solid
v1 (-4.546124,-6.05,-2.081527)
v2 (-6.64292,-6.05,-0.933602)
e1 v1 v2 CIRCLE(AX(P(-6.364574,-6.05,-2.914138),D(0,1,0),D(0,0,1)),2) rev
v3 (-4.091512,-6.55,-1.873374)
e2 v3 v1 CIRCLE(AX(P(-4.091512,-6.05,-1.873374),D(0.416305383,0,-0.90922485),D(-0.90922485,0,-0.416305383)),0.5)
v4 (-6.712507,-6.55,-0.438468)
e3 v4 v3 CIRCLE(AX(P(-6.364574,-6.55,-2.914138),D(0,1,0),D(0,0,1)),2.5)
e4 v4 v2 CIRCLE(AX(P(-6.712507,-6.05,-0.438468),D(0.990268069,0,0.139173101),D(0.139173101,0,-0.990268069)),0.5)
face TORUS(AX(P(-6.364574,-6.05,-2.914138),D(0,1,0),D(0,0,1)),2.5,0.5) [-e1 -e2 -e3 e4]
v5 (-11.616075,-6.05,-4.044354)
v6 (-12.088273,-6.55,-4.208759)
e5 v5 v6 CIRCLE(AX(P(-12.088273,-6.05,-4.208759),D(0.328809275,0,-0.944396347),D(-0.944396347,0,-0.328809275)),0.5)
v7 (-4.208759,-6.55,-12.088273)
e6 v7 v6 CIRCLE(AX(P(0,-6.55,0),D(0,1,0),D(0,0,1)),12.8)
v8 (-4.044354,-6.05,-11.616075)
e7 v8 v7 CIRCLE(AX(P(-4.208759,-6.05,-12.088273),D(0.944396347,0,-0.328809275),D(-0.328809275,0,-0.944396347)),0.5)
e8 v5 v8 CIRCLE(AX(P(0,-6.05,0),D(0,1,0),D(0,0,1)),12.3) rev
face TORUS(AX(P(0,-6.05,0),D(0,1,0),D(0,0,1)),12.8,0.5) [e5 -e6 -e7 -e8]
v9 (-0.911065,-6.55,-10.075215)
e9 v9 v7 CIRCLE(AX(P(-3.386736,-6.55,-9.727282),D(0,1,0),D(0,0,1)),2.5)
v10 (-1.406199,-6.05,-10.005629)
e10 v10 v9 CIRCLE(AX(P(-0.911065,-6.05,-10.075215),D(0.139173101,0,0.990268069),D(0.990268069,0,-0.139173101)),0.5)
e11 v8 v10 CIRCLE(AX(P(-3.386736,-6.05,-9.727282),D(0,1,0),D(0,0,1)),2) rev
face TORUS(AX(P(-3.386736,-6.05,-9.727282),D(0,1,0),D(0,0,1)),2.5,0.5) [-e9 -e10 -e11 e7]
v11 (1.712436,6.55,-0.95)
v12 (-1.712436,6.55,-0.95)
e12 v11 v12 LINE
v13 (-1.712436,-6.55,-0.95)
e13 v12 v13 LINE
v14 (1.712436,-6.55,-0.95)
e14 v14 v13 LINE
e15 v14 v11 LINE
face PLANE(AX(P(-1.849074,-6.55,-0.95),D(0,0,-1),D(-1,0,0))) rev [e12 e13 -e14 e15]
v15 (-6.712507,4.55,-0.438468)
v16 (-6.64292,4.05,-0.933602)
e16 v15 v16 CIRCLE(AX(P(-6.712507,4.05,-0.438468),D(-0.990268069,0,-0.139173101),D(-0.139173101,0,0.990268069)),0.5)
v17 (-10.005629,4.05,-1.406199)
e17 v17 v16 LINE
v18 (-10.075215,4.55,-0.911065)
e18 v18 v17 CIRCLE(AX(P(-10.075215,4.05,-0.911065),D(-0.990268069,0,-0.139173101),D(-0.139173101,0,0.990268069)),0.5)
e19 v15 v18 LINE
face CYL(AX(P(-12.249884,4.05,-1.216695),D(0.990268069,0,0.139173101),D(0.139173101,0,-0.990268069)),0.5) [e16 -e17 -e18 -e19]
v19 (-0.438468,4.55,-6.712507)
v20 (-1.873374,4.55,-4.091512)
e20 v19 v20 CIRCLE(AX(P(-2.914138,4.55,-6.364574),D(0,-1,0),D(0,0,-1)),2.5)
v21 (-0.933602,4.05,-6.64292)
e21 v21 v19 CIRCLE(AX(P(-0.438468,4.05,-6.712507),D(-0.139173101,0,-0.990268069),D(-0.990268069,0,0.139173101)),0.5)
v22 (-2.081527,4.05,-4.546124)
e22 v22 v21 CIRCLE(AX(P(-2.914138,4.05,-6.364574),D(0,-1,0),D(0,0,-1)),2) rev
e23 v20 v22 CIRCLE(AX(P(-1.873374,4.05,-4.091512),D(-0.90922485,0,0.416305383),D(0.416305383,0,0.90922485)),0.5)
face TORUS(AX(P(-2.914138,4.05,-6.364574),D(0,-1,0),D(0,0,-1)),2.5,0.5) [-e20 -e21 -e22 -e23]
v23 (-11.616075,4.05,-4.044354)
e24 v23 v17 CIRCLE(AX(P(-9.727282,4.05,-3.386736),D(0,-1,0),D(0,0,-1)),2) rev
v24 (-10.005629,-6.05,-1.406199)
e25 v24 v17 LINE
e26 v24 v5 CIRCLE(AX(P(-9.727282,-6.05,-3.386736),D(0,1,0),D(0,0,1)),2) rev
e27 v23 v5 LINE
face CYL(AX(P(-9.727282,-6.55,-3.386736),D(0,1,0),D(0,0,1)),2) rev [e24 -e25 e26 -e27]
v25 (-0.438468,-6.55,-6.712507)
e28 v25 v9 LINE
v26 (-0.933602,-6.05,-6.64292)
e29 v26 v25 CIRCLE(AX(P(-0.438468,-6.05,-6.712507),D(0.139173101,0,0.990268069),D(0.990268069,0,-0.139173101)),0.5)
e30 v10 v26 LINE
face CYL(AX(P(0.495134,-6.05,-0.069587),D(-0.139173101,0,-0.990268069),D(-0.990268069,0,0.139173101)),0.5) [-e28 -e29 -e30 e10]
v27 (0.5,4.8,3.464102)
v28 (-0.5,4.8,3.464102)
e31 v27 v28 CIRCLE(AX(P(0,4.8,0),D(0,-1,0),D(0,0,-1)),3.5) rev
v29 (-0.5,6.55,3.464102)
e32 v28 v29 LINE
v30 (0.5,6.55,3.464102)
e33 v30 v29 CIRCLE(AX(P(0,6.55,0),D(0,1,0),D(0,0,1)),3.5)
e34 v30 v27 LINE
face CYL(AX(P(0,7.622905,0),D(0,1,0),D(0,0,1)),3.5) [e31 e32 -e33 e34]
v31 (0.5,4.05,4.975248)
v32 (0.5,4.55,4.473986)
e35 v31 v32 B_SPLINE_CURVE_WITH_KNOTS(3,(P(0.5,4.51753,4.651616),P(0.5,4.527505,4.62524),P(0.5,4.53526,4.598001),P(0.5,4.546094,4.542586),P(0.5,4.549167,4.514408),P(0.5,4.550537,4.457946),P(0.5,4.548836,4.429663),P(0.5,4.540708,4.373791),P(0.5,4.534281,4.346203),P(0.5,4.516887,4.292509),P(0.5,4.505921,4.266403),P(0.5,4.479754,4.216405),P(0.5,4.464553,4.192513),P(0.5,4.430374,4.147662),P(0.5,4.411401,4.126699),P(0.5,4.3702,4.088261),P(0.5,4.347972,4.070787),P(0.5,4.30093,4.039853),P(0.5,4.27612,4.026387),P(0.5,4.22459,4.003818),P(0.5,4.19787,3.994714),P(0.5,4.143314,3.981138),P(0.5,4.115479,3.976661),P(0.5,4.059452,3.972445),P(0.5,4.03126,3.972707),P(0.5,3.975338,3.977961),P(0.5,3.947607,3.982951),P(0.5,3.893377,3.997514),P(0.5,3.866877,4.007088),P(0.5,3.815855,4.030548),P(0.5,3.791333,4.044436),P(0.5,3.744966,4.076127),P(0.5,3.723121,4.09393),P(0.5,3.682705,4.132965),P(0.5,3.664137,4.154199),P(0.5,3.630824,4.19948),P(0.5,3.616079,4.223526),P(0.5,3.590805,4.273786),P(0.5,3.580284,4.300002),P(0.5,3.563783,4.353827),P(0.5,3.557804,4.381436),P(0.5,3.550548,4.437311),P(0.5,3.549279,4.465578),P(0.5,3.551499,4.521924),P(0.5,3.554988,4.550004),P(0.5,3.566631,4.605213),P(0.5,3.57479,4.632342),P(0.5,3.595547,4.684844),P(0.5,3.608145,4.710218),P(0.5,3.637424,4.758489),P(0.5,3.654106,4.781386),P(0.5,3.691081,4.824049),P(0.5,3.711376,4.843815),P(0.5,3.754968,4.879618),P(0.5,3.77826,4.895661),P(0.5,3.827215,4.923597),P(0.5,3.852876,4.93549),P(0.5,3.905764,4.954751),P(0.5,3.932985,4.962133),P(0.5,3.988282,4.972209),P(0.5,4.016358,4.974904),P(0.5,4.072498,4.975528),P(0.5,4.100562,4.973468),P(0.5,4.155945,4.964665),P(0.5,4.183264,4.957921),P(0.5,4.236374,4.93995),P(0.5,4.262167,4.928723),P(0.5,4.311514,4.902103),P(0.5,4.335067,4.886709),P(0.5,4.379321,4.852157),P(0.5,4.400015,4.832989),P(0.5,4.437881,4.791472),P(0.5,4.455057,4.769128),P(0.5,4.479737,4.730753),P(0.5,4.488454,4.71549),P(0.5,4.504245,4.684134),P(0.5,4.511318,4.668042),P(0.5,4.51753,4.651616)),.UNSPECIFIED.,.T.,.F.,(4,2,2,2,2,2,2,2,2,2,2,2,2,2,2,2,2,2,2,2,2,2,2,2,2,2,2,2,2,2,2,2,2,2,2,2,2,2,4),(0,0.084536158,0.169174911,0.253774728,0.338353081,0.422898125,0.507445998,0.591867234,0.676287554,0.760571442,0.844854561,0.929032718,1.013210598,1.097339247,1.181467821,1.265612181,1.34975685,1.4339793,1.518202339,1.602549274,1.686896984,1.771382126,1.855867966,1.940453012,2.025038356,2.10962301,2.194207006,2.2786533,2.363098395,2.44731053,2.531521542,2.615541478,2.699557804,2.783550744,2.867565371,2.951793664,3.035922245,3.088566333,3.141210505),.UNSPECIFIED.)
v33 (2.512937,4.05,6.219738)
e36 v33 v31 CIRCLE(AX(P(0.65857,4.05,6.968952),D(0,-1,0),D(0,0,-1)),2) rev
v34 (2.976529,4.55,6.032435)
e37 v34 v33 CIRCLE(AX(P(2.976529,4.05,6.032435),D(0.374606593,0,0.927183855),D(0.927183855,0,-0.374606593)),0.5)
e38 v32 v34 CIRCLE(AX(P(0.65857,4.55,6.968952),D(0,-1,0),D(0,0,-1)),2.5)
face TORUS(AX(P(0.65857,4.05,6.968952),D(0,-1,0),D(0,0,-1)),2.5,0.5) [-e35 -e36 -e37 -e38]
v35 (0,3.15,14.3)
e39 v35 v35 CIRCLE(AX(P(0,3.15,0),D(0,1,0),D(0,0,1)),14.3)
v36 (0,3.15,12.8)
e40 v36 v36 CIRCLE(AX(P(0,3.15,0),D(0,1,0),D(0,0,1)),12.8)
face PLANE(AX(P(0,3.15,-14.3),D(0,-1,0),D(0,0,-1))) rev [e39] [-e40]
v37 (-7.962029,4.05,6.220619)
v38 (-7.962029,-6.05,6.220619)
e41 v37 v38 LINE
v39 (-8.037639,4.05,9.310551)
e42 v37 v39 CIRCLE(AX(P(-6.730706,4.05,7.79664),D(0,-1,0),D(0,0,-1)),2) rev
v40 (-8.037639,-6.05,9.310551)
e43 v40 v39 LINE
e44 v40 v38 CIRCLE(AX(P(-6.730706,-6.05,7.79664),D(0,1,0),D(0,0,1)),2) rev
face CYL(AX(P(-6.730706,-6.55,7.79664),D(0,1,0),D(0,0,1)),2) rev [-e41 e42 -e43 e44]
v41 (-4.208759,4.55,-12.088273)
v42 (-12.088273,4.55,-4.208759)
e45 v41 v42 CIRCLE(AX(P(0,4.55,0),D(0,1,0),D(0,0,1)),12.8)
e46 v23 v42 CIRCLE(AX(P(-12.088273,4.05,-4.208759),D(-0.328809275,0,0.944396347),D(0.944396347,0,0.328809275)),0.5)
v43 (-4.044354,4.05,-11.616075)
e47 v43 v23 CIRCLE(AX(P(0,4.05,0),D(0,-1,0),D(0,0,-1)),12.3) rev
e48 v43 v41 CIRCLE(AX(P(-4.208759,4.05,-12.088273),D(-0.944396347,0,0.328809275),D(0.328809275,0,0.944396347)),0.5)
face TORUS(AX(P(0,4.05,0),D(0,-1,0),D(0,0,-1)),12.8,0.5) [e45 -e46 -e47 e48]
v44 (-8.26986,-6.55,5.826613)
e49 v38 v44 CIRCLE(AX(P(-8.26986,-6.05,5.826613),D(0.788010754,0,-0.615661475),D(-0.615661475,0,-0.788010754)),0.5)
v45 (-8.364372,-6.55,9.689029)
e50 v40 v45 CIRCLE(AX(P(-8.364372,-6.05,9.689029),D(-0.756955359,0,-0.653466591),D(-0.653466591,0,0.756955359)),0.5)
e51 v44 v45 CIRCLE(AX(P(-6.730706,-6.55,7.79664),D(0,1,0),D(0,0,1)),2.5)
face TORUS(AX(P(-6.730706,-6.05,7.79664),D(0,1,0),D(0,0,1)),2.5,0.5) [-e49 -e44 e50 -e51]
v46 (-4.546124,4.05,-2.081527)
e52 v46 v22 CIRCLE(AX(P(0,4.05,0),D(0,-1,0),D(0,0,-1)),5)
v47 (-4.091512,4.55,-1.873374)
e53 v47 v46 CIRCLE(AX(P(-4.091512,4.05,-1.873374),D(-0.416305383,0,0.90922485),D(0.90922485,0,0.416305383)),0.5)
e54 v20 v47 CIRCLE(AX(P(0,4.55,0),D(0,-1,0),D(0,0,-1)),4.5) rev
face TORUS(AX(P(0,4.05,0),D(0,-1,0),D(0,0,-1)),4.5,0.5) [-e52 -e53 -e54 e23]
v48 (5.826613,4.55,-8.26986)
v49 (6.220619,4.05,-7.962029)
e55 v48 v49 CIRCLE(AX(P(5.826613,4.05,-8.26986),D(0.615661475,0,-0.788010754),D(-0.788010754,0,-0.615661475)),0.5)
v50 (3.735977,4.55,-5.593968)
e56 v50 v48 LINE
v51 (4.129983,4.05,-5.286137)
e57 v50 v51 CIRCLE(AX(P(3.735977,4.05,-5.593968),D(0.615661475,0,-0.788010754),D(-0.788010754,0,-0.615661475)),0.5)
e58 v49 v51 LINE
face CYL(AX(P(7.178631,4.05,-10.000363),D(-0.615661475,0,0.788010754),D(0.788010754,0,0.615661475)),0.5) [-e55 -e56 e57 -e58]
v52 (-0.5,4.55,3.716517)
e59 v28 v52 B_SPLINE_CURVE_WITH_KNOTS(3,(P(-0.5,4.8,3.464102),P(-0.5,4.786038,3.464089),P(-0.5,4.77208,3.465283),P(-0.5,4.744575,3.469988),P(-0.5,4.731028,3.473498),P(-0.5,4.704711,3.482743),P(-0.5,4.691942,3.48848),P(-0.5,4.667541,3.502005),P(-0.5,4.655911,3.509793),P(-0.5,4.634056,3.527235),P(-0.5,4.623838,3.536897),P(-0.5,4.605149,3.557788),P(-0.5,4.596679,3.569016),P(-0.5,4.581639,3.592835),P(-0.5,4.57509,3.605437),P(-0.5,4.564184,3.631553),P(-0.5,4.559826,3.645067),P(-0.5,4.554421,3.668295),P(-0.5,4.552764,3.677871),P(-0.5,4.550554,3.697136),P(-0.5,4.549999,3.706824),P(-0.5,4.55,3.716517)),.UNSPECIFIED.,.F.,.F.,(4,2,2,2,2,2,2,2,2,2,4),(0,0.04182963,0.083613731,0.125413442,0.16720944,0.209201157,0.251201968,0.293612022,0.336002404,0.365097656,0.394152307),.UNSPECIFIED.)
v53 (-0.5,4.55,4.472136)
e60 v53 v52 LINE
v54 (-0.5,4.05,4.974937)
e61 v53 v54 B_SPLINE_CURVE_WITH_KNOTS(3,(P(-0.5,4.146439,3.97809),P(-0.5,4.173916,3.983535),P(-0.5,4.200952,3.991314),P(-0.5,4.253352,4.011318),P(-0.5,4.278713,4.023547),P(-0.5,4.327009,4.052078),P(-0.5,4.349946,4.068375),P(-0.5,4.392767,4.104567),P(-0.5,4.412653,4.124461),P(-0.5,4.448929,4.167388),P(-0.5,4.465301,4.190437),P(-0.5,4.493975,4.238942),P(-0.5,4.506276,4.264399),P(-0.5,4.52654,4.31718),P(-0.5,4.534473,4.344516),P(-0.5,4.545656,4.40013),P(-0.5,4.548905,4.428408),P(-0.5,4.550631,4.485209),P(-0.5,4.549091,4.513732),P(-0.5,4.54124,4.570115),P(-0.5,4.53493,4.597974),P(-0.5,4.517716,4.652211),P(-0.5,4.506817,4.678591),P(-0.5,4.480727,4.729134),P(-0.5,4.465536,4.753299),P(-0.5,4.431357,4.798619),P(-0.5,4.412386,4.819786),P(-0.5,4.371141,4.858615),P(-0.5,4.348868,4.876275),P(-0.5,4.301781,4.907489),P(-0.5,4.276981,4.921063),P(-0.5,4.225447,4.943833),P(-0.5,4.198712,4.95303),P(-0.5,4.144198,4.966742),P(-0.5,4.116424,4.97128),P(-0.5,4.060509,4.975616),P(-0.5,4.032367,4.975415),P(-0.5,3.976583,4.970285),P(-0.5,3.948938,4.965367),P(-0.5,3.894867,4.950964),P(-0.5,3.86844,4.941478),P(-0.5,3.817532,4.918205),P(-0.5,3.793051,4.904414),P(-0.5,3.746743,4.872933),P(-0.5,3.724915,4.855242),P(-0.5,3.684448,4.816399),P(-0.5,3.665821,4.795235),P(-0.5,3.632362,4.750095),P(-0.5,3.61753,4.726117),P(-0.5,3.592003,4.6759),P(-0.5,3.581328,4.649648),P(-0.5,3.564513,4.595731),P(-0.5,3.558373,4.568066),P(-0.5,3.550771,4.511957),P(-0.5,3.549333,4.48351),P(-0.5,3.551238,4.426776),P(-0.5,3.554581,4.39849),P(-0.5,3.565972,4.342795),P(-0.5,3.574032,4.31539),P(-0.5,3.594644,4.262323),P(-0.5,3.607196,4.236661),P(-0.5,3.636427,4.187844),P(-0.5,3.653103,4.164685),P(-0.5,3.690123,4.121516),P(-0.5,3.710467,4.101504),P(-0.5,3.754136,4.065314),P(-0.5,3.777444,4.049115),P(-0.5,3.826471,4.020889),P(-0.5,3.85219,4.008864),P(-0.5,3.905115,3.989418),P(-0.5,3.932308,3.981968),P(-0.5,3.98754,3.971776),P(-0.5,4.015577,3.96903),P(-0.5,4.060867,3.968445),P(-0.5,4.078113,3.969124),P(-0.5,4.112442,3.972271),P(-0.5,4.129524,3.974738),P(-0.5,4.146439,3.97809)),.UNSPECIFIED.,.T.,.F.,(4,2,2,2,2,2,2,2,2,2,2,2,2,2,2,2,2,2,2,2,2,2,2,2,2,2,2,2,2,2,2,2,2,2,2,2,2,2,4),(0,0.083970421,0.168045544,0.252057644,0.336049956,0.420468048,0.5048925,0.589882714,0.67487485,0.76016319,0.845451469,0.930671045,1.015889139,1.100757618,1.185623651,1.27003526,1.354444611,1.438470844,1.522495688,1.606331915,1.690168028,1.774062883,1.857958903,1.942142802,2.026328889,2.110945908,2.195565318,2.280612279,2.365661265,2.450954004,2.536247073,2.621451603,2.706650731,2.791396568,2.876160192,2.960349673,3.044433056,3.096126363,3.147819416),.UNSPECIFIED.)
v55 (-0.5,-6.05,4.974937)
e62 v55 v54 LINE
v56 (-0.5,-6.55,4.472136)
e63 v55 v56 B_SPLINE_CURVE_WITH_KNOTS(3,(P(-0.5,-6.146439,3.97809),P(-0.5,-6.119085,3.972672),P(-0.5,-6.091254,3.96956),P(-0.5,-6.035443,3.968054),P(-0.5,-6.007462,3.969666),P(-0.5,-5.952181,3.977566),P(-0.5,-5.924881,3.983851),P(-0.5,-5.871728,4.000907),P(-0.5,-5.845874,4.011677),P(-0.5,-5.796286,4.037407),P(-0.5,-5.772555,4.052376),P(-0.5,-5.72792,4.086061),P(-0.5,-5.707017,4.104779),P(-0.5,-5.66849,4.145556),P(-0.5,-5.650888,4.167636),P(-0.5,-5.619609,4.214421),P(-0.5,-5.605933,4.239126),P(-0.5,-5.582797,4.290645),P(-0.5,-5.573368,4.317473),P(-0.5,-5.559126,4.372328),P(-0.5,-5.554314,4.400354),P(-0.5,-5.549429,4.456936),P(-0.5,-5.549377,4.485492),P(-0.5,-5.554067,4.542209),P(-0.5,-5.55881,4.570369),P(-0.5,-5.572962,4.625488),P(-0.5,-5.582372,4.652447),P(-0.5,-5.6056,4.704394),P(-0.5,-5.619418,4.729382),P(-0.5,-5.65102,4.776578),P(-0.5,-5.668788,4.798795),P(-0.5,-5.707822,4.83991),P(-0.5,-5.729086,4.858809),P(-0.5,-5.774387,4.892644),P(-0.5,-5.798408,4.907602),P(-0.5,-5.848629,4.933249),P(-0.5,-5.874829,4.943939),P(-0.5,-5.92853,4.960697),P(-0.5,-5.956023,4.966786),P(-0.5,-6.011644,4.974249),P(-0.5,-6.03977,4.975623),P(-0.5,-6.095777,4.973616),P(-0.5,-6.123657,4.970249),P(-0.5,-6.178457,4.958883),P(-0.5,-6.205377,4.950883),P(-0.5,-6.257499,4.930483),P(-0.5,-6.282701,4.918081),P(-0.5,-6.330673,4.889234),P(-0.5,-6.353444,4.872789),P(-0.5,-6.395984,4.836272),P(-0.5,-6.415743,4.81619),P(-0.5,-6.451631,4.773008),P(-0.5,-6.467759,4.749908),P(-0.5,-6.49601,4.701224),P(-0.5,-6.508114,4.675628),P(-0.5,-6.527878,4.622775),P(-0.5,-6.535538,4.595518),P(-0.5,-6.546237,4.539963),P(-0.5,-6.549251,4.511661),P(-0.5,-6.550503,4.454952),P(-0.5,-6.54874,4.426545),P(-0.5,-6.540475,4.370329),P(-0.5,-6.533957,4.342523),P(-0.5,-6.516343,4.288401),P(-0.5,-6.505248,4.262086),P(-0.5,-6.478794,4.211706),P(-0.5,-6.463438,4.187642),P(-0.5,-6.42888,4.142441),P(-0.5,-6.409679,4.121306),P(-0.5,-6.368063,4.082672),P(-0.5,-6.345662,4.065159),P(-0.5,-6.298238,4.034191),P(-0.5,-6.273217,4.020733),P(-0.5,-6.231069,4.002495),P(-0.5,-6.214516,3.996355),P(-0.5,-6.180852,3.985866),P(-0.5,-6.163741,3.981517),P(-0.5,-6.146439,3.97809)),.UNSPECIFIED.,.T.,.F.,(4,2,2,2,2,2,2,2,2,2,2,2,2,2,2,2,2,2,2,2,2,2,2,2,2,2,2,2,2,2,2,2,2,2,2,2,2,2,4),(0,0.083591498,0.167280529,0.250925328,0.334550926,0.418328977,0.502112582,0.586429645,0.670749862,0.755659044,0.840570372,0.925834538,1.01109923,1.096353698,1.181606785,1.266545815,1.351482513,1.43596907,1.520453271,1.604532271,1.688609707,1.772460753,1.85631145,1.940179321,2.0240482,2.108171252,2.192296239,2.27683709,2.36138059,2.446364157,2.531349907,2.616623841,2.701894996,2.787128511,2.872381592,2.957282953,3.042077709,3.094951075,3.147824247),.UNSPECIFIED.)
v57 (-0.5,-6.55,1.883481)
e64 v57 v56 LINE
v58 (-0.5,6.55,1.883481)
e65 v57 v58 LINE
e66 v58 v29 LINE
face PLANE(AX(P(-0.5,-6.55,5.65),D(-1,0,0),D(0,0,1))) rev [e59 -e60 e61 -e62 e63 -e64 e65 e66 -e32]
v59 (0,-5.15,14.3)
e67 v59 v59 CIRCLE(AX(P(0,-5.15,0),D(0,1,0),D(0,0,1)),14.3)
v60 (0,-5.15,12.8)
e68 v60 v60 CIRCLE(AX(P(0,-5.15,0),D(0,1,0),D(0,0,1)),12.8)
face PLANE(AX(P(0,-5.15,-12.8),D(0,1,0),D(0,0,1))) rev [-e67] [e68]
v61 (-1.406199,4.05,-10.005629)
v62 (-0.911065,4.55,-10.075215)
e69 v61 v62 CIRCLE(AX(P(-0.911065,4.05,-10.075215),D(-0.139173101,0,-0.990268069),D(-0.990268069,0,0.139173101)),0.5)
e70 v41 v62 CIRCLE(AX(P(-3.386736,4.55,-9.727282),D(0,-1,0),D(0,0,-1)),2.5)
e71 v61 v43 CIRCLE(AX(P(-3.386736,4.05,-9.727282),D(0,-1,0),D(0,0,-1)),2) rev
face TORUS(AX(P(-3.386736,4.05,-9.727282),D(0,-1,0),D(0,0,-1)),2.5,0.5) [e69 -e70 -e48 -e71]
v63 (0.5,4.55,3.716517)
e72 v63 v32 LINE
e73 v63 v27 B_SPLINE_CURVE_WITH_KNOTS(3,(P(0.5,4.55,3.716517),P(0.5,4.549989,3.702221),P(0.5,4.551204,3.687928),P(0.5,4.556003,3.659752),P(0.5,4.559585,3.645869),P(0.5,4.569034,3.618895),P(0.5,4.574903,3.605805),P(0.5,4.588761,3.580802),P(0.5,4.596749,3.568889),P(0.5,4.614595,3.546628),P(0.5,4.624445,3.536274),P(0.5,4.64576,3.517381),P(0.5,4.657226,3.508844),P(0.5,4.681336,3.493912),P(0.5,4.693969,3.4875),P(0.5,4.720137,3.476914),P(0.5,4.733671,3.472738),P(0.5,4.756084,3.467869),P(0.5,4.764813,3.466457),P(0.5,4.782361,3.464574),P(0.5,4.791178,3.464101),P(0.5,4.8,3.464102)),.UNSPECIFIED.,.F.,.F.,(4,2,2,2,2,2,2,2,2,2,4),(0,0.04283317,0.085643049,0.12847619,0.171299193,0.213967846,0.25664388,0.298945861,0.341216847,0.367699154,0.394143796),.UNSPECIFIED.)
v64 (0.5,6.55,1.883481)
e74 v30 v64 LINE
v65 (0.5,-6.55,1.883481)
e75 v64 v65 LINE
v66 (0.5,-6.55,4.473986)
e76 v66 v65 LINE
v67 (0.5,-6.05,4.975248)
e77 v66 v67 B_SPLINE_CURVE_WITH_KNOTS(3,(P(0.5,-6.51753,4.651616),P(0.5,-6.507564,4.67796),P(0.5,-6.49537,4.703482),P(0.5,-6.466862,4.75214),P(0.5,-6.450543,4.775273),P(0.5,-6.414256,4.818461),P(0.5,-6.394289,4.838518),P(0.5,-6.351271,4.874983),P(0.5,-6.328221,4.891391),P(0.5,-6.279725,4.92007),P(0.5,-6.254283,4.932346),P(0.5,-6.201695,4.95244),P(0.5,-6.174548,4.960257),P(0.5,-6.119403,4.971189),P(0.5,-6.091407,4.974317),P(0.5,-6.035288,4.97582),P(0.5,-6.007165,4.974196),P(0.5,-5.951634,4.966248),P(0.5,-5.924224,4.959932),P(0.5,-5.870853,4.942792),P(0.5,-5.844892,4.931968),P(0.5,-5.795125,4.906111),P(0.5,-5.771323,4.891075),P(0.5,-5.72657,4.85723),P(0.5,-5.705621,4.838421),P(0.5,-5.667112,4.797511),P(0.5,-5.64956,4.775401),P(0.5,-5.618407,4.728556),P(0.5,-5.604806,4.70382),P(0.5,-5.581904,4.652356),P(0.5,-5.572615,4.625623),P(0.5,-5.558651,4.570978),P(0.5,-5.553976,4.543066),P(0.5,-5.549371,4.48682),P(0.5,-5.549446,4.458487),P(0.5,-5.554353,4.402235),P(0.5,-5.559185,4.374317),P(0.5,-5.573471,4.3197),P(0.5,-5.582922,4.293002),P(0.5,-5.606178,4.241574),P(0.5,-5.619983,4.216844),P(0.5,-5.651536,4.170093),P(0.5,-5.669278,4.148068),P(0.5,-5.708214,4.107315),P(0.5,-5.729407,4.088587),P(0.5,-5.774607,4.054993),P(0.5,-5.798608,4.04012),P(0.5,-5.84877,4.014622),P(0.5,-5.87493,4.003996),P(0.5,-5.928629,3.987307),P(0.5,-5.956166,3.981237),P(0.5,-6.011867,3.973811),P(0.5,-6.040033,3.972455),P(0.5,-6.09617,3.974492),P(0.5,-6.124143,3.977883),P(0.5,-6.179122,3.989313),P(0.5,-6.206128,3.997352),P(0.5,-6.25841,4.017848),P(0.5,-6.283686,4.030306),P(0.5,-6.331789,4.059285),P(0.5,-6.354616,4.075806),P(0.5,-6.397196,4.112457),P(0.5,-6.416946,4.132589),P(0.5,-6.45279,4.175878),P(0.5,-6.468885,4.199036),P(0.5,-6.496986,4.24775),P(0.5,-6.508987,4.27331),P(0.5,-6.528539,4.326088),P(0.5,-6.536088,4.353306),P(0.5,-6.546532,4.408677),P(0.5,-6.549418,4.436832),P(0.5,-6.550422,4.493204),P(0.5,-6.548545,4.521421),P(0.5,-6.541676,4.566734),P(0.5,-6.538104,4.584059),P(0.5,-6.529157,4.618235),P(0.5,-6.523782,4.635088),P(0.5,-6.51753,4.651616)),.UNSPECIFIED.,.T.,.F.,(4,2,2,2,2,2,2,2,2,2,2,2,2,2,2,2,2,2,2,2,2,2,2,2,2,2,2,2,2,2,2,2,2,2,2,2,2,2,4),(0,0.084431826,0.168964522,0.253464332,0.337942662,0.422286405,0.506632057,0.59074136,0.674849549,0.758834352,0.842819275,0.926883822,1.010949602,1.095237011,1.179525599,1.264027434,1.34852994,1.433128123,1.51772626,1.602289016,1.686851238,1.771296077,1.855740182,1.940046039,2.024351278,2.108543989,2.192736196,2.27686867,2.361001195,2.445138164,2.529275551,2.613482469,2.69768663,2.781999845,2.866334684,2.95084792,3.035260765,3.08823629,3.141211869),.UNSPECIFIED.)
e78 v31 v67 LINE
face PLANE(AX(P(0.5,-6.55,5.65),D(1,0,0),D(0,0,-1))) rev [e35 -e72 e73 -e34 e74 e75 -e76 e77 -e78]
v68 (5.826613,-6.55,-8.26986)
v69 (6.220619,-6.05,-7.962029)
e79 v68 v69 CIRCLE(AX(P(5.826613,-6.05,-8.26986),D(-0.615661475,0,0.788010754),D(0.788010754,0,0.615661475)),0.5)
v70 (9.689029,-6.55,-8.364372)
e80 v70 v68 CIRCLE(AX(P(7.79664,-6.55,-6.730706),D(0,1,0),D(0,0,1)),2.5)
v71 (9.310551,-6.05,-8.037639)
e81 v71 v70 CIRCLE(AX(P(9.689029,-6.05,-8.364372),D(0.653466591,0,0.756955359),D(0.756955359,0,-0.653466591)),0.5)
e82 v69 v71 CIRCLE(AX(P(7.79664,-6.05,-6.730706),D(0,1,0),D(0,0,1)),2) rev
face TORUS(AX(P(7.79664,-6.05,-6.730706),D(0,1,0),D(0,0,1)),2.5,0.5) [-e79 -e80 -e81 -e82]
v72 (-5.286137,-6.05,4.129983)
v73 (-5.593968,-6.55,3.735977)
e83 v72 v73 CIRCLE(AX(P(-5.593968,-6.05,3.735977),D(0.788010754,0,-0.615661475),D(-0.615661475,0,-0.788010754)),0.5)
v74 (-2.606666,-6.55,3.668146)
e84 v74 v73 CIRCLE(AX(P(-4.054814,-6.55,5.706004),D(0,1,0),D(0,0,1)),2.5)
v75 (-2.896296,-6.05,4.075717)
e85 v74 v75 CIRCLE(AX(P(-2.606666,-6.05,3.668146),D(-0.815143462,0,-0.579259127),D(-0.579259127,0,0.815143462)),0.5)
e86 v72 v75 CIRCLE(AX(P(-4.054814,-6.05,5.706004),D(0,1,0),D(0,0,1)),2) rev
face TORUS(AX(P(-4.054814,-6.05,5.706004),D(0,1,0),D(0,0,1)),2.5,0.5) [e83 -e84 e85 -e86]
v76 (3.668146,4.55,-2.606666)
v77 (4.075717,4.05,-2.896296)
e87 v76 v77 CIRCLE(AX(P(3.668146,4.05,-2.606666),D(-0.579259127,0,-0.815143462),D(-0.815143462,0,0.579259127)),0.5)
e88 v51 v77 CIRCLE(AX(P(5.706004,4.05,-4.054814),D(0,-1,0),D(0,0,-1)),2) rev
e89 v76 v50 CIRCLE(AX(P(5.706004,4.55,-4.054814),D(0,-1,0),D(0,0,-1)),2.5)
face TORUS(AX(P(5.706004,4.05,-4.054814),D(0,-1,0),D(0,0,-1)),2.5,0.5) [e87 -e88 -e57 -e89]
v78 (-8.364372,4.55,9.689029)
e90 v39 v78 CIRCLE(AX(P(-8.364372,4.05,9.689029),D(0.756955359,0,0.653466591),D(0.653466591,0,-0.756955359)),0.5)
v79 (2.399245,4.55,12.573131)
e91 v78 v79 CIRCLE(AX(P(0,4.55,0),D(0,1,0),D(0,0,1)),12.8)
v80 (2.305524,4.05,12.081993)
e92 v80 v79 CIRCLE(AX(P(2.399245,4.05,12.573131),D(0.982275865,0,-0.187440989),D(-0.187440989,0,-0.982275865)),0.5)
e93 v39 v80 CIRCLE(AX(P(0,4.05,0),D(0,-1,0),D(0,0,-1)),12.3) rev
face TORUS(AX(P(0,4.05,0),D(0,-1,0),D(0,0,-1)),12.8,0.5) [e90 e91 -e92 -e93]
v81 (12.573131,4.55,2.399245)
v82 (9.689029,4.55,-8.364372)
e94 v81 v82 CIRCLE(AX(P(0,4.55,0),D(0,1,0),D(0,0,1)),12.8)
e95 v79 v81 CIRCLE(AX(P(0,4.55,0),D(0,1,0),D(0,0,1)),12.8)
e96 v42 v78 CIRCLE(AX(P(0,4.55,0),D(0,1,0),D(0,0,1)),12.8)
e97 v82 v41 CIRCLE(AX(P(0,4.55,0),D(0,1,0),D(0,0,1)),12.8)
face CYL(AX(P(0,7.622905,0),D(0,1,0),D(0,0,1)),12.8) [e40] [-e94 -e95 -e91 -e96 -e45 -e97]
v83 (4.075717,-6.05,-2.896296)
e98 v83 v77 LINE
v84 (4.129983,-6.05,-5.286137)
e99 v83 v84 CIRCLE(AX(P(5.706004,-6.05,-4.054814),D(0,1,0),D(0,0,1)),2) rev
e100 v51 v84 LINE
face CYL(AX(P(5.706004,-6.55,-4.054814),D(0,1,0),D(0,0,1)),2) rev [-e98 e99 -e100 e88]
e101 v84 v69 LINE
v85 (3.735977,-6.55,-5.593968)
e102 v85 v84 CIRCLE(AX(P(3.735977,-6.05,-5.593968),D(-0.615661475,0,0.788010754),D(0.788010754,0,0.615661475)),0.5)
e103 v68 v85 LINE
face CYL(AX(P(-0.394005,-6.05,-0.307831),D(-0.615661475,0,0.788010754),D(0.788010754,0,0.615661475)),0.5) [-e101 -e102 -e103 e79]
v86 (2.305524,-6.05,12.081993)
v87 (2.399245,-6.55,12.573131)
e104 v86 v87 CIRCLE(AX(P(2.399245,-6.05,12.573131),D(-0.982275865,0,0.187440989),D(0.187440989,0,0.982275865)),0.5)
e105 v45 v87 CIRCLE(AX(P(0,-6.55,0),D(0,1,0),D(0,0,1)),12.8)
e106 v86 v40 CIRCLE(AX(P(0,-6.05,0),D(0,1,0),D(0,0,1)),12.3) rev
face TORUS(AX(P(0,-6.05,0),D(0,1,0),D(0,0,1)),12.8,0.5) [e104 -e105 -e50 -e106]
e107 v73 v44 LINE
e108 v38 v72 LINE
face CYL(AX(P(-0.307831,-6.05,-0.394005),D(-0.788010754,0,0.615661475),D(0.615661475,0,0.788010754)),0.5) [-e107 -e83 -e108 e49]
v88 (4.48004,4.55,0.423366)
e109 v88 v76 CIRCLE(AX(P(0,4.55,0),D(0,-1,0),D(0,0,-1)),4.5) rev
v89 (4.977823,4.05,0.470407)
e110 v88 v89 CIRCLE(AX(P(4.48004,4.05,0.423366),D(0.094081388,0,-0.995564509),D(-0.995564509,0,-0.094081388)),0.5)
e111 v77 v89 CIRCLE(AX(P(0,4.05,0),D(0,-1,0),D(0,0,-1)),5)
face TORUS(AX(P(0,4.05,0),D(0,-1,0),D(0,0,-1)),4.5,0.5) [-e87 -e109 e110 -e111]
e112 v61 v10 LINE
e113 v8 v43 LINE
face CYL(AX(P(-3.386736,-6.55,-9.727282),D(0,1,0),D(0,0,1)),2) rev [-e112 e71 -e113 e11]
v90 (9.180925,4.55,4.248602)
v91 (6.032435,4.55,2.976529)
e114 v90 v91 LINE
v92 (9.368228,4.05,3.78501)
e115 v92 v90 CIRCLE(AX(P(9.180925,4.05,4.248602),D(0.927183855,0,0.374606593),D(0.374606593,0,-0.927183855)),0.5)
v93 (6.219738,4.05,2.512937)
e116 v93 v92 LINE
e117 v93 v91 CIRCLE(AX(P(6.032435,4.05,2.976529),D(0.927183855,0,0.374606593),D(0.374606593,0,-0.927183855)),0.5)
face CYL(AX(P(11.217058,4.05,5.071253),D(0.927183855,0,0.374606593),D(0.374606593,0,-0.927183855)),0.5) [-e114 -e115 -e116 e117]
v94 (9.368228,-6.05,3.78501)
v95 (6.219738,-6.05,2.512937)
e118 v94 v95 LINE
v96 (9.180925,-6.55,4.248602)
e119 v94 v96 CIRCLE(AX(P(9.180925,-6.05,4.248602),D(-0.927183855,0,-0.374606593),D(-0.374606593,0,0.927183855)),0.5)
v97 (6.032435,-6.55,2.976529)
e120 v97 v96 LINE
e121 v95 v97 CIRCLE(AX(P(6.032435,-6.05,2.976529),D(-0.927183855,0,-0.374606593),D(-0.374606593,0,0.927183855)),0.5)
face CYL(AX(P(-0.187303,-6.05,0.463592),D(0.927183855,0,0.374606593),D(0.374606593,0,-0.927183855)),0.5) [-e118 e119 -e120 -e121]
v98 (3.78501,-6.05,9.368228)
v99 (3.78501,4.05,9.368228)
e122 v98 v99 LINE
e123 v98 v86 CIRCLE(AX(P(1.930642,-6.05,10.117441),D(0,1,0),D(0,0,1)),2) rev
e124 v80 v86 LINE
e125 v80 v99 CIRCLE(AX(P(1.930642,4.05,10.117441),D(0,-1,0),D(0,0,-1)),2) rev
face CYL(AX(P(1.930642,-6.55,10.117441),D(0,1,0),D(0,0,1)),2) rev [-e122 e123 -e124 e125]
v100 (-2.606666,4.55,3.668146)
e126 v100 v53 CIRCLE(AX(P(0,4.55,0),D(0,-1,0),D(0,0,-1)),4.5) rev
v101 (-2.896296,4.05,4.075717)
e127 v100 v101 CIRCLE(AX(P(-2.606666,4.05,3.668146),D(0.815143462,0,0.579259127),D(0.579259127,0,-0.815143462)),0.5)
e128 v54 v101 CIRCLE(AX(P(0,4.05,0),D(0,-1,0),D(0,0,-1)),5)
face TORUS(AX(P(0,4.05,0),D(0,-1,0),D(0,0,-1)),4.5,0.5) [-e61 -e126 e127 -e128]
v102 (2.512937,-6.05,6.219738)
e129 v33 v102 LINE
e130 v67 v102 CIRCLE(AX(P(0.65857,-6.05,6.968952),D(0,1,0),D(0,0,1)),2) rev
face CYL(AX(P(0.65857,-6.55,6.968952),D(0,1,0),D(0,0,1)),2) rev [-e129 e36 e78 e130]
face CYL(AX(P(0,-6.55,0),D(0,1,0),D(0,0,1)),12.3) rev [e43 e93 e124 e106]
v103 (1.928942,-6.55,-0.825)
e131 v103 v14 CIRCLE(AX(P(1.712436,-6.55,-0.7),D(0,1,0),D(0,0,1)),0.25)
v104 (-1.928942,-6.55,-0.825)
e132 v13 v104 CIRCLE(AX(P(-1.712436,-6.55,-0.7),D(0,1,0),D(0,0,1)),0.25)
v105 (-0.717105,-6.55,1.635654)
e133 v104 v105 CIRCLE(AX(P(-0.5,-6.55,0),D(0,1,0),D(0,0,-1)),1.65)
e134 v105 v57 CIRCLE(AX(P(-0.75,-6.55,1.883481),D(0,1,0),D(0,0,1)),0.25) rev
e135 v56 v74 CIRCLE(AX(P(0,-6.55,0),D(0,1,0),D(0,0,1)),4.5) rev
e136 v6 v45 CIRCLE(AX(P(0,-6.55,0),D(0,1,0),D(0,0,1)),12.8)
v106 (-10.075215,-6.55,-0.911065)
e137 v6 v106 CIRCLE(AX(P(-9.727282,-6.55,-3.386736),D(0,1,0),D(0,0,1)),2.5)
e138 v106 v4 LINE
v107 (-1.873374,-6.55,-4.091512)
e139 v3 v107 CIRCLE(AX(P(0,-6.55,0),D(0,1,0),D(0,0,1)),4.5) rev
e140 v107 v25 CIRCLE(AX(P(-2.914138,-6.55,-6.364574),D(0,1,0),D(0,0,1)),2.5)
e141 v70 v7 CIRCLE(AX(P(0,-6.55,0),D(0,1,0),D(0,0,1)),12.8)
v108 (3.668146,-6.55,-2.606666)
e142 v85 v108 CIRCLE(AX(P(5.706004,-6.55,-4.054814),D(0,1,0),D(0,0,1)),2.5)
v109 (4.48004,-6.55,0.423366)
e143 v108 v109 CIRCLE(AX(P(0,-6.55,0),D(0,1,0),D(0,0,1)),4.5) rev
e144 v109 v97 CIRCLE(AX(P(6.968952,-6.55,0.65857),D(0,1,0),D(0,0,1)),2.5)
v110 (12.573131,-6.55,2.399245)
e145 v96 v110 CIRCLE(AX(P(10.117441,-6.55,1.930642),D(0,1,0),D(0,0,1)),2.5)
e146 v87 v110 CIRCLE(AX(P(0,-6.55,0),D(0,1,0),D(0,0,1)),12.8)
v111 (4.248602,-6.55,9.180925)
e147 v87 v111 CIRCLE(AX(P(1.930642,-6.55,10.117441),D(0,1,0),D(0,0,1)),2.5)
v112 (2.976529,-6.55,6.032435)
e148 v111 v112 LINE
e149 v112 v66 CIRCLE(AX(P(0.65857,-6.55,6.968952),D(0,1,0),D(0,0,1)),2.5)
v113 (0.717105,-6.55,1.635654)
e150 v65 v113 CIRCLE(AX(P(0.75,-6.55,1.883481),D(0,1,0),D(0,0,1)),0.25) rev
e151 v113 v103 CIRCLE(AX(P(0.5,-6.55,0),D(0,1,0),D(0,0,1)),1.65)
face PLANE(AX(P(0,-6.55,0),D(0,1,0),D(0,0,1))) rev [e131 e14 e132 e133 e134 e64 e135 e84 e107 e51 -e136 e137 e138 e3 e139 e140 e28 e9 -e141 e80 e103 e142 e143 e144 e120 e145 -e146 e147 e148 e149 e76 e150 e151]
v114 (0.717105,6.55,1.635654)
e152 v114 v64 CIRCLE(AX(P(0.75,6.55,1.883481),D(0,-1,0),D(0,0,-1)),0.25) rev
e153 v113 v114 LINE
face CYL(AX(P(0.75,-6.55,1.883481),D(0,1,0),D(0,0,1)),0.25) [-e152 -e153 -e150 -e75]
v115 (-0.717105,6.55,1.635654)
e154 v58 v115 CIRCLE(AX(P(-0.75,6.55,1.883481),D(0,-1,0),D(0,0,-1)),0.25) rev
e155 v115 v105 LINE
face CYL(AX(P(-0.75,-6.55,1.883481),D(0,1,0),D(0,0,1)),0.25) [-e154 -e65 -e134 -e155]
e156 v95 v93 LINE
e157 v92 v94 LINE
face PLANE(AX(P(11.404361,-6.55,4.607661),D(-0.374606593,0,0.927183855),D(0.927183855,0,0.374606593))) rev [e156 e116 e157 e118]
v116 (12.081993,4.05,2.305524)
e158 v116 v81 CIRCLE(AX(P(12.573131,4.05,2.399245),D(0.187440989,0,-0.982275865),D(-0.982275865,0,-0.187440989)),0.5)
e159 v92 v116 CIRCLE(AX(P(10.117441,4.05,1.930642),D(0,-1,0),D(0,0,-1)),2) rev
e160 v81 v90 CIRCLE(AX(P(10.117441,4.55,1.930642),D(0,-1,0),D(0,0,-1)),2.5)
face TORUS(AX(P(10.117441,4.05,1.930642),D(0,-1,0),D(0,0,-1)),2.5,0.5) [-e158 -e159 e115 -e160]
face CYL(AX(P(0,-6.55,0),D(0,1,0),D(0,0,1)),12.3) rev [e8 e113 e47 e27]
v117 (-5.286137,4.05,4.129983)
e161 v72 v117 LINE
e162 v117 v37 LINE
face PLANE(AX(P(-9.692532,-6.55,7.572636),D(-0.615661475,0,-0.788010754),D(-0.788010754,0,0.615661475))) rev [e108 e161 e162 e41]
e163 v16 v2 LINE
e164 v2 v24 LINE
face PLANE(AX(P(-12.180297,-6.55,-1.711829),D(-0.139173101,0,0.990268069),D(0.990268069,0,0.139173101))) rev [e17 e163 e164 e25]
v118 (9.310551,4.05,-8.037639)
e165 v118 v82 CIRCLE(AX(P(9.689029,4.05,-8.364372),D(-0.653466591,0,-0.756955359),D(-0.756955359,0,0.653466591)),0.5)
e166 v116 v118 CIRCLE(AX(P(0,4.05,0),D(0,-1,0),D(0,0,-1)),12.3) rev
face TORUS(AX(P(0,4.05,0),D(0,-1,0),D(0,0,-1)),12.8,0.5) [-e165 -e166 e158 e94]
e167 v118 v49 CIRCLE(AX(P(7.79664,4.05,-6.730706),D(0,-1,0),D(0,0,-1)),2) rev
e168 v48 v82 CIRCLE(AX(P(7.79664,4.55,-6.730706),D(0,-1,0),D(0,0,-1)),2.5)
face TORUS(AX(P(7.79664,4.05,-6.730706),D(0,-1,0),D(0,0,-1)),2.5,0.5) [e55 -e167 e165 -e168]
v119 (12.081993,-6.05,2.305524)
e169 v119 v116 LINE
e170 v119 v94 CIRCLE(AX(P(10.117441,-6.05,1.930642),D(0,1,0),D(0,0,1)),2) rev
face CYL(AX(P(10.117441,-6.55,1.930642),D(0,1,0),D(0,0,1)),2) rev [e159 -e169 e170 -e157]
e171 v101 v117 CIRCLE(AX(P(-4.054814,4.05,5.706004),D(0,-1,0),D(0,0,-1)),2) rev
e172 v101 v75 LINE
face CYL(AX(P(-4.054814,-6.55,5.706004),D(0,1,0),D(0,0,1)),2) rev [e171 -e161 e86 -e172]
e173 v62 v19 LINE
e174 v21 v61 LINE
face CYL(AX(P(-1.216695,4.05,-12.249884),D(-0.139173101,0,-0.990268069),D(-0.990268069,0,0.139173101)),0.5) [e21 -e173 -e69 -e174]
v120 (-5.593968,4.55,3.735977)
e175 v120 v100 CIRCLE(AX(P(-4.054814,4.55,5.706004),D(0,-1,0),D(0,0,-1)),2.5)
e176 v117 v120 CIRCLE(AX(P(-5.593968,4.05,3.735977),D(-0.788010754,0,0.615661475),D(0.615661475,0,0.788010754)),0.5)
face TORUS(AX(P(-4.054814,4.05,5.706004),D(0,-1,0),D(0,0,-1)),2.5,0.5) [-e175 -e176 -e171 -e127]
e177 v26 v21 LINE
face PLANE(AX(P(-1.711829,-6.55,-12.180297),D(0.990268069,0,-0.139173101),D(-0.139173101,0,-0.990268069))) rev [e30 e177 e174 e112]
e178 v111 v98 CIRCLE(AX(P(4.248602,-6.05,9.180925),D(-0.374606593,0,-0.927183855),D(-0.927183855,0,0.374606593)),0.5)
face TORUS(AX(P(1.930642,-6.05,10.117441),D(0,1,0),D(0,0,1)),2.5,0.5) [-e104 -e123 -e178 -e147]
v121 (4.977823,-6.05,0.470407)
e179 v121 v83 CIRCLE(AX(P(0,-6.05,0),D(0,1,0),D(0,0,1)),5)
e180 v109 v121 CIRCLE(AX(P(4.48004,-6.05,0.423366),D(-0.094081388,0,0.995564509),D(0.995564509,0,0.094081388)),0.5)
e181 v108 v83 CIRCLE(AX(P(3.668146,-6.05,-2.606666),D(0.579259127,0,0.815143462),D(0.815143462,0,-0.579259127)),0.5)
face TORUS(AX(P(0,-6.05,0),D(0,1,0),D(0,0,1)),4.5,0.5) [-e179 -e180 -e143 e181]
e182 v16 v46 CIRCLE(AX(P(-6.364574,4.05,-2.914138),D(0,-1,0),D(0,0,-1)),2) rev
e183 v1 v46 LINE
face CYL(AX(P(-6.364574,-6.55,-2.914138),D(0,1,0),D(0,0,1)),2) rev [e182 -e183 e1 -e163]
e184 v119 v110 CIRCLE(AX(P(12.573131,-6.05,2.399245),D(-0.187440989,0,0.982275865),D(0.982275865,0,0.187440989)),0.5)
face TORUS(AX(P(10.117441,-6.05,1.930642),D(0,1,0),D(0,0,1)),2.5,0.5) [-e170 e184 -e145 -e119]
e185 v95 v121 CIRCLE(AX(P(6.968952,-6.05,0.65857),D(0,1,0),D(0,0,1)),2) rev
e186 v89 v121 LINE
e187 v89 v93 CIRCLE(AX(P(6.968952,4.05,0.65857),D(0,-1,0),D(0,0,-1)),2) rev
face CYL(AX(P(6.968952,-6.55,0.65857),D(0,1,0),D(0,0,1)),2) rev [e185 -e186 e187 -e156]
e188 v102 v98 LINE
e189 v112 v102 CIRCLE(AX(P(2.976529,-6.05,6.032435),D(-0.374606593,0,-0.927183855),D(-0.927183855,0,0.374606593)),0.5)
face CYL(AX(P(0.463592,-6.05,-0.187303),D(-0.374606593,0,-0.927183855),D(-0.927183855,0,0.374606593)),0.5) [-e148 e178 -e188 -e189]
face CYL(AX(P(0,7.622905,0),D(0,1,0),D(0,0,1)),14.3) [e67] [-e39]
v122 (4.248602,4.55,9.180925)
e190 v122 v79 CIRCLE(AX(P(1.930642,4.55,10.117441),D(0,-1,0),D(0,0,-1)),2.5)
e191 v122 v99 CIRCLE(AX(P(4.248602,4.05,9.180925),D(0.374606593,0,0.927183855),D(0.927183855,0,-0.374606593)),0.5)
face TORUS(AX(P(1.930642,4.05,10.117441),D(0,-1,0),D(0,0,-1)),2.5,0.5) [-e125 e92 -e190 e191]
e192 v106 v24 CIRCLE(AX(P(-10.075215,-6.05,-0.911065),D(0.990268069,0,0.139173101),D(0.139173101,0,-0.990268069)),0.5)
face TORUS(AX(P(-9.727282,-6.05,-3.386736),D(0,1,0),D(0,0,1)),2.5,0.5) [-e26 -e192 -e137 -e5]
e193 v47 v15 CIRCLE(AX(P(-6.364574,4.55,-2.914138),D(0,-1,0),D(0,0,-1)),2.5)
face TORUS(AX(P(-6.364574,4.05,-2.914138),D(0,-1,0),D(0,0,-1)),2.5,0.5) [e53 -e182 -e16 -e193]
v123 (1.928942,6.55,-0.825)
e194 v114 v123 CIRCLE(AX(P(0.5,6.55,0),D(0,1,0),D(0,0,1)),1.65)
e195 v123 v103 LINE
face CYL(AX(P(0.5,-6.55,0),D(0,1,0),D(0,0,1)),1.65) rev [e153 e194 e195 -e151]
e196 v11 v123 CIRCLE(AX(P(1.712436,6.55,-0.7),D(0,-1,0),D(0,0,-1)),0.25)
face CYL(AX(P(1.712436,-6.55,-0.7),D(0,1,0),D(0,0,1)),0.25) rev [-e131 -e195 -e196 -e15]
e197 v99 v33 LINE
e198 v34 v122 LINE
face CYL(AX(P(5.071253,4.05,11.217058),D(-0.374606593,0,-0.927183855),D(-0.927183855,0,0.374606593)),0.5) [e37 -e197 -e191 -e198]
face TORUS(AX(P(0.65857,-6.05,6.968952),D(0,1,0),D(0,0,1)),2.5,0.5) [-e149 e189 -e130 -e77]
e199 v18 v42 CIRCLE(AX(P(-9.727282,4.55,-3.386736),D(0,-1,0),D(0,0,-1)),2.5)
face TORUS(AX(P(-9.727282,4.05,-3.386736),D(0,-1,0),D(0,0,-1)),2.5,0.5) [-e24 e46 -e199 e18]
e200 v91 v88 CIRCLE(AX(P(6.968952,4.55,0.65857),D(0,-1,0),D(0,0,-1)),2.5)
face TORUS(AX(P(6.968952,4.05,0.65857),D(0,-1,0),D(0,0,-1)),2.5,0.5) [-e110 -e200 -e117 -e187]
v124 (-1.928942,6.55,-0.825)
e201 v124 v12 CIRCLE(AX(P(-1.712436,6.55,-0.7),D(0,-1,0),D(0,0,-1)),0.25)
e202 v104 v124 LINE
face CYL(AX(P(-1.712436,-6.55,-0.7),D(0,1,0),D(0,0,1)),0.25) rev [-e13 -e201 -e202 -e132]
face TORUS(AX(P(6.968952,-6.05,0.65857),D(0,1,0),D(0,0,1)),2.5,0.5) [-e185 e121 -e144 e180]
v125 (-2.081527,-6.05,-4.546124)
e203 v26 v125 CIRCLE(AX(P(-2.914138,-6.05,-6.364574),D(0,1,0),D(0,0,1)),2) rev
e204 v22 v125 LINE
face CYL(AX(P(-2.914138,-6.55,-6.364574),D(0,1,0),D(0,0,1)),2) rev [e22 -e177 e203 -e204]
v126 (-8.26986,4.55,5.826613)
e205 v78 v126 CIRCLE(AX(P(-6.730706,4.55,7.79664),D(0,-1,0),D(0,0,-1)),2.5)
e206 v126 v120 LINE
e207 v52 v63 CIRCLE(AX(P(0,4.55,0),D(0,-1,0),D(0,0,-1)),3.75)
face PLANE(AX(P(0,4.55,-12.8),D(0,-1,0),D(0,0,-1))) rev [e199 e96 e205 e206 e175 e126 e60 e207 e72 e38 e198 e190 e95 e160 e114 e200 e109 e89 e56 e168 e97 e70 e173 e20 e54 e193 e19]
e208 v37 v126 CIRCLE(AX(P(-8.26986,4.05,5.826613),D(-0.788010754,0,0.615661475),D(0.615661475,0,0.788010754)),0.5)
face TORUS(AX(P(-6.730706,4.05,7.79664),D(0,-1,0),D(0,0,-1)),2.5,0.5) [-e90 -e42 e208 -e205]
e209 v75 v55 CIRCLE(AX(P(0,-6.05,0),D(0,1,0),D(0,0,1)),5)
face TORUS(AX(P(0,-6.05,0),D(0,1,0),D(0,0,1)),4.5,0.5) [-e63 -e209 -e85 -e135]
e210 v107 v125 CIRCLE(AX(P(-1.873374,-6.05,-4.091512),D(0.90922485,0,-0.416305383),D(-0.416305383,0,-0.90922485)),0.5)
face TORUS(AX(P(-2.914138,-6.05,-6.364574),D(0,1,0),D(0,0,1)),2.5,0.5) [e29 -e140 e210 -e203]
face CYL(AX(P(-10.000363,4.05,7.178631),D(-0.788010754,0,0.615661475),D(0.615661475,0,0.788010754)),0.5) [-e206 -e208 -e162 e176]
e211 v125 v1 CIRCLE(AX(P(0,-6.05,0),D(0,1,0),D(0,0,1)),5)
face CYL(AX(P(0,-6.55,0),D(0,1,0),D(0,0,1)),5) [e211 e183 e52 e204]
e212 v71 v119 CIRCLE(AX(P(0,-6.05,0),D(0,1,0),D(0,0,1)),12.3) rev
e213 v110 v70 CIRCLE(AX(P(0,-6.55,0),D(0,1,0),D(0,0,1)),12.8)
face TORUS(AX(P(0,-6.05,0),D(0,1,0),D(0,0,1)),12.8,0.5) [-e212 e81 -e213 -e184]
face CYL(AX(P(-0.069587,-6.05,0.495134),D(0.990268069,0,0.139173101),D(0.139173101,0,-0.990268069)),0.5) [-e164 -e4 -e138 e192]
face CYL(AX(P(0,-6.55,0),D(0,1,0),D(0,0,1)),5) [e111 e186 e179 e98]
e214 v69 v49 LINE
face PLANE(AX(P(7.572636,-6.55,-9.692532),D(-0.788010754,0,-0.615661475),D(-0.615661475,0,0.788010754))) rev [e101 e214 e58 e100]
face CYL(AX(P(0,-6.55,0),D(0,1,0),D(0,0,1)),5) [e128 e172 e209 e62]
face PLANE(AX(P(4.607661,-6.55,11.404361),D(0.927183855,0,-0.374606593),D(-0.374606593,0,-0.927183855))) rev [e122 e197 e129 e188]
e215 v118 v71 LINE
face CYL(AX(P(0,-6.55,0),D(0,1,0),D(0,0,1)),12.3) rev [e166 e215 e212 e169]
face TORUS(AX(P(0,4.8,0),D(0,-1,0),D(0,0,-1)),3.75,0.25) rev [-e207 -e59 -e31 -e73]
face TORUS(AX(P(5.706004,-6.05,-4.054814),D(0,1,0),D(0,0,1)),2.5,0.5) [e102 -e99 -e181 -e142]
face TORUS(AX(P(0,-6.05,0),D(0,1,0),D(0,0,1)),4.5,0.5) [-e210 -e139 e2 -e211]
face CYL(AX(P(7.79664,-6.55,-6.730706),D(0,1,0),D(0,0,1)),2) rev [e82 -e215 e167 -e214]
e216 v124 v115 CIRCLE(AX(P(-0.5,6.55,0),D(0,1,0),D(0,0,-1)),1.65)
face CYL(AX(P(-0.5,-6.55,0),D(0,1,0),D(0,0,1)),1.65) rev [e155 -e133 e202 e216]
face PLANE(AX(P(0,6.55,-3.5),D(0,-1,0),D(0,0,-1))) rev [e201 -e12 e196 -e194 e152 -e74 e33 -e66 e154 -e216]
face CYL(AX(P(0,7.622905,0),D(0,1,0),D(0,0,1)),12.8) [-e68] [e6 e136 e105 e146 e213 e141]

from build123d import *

# Parameters (mm, degrees)
CUT_EXTRUDE1_DEPTH       = 24.069243594
FILLET1_R                = 2
FILLET2_R                = 0.5
CIRPATTERN1_COUNT        = 3
FILLET1_OF_CIRPATTERN1_R = 2
FILLET2_OF_CIRPATTERN1_R = 0.5
CUT_EXTRUDE3_DEPTH       = 25.095435307
FILLET3_R                = 0.25
FILLET4_R                = 0.25


with BuildPart() as part:
    # Sketch1 → Revolve1 (revolve)
    with BuildSketch(Plane(origin=(0, 0, 0), x_dir=(0, 0, -1), z_dir=(1, 0, 0)), mode=Mode.PRIVATE) as revolve1_sk:
        Polygon((0, -6.55), (12.8, -6.55), (12.8, -5.15), (14.3, -5.15), (14.3, 3.15), (12.8, 3.15), (12.8, 4.55), (3.5, 4.55), (3.5, 6.55), (0, 6.55), align=None)
    revolve(revolve1_sk.sketch.rotate(Axis((0, 7.622905435, 0), (0, -1, 0)), 180), axis=Axis((0, 7.622905435, 0), (0, -1, 0)))

    # Sketch2 → Cut-Extrude1 (cut, through all)
    with BuildSketch(Plane(origin=(0, 4.55, 0), x_dir=(1, 0, 0), z_dir=(0, 1, 0))):
        with BuildLine():
            Line((-1.711829142, 12.180297246), (-0.695865505, 4.951340344))
            ThreePointArc((-0.695865505, 4.951340344), (-3.535533906, 3.535533906), (-4.951340344, 0.695865505))
            Line((-4.951340344, 0.695865505), (-12.180297246, 1.711829142))
            ThreePointArc((-12.180297246, 1.711829142), (-8.697413409, 8.697413409), (-1.711829142, 12.180297246))
        make_face()
    cut_extrude1 = extrude(amount=-CUT_EXTRUDE1_DEPTH, mode=Mode.SUBTRACT)

    # Fillet1
    fillet1_edges = [part.edges().sort_by_distance(p)[0] for p in [
        (-12.180297246, -1, -1.711829142),
        (-1.711829142, -1, -12.180297246),
        (-0.695865505, -1, -4.951340344),
        (-4.951340344, -1, -0.695865505),
    ]]
    fillet(fillet1_edges, radius=FILLET1_R)

    # Fillet2
    fillet2_edges = [part.edges().sort_by_distance(p)[0] for p in [
        (-3.535533906, 4.55, -3.535533906),
        (-3.535533906, -6.55, -3.535533906),
        (-8.324274366, 4.55, -1.169900468),
        (-8.324274366, -6.55, -1.169900468),
        (-1.169900468, 4.55, -8.324274366),
        (-1.169900468, -6.55, -8.324274366),
        (-8.697413409, 4.55, -8.697413409),
        (-8.697413409, -6.55, -8.697413409),
        (-5.404150679, 4.55, -1.159832365),
        (-5.404150679, -6.55, -1.159832365),
        (-1.159832365, 4.55, -5.404150679),
        (-1.159832365, -6.55, -5.404150679),
        (-11.43435232, 4.55, -2.344664413),
        (-11.43435232, -6.55, -2.344664413),
        (-2.344664413, 4.55, -11.43435232),
        (-2.344664413, -6.55, -11.43435232),
    ]]
    fillet(fillet2_edges, radius=FILLET2_R - 0.0001)  # a hair under: the kernel refuses the full size

    # CirPattern1: Cut-Extrude1 ×3 about axis
    cirpattern1_axis = Axis((0, 0, 0), (0, 1, 0))
    for i in range(1, CIRPATTERN1_COUNT):
        add(cut_extrude1.rotate(cirpattern1_axis, i * 360 / CIRPATTERN1_COUNT), mode=Mode.SUBTRACT)

    # Fillet1 of CirPattern1
    fillet1_of_cirpattern1_edges = [part.edges().sort_by_distance(p)[0] for p in [
        (4.607661099, -1, 11.404361411),
        (-9.692532269, -1, 7.572636147),
        (-3.940053768, -1, 3.078307377),
        (1.873032967, -1, 4.635919273),
        (7.572636147, -1, -9.692532269),
        (11.404361411, -1, 4.607661099),
        (4.635919273, -1, 1.873032967),
        (3.078307377, -1, -3.940053768),
    ]]
    fillet(fillet1_of_cirpattern1_edges, radius=FILLET1_OF_CIRPATTERN1_R)

    # Fillet2 of CirPattern1
    fillet2_of_cirpattern1_edges = [part.edges().sort_by_distance(p)[0] for p in [
        (-1.294095226, 4.55, 4.829629131),
        (-1.294095226, -6.55, 4.829629131),
        (3.148973658, 4.55, 7.793983303),
        (3.148973658, -6.55, 7.793983303),
        (-6.624082835, 4.55, 5.175300708),
        (-6.624082835, -6.55, 5.175300708),
        (-3.183474255, 4.55, 11.880887663),
        (-3.183474255, -6.55, 11.880887663),
        (1.697631047, 4.55, 5.260047957),
        (1.697631047, -6.55, 5.260047957),
        (-4.100215591, 4.55, 3.706519632),
        (-4.100215591, -6.55, 3.706519632),
        (3.686637215, 4.55, 11.074771791),
        (3.686637215, -6.55, 11.074771791),
        (-8.730107378, 4.55, 7.747715105),
        (-8.730107378, -6.55, 7.747715105),
        (4.829629131, 4.55, -1.294095226),
        (4.829629131, -6.55, -1.294095226),
        (5.175300708, 4.55, -6.624082835),
        (5.175300708, -6.55, -6.624082835),
        (7.793983303, 4.55, 3.148973658),
        (7.793983303, -6.55, 3.148973658),
        (11.880887663, 4.55, -3.183474255),
        (11.880887663, -6.55, -3.183474255),
        (3.706519632, 4.55, -4.100215591),
        (3.706519632, -6.55, -4.100215591),
        (5.260047957, 4.55, 1.697631047),
        (5.260047957, -6.55, 1.697631047),
        (7.747715105, 4.55, -8.730107378),
        (7.747715105, -6.55, -8.730107378),
        (11.074771791, 4.55, 3.686637215),
        (11.074771791, -6.55, 3.686637215),
    ]]
    fillet(fillet2_of_cirpattern1_edges, radius=FILLET2_OF_CIRPATTERN1_R - 0.0001)  # a hair under: the kernel refuses the full size

    # Sketch3 → Cut-Extrude3 (cut, through all)
    with BuildSketch(Plane(origin=(0, 6.55, 0), x_dir=(1, 0, 0), z_dir=(0, 1, 0))):
        with BuildLine():
            Line((-0.5, -5.65), (-0.5, -1.65))
            ThreePointArc((-0.5, -1.65), (-1.964581852, -0.759934208), (-1.849073756, 0.95))
            Line((-1.849073756, 0.95), (1.849073756, 0.95))
            ThreePointArc((1.849073756, 0.95), (1.964581852, -0.759934208), (0.5, -1.65))
            Line((0.5, -1.65), (0.5, -5.65))
            Line((0.5, -5.65), (-0.5, -5.65))
        make_face()
    extrude(amount=-CUT_EXTRUDE3_DEPTH, mode=Mode.SUBTRACT)

    # Fillet3
    fillet3_edges = [part.edges().sort_by_distance(p)[0] for p in [
        (0.5, 0, 1.65),
        (-0.5, 0, 1.65),
        (-1.849073756, 0, -0.95),
        (1.849073756, 0, -0.95),
    ]]
    fillet(fillet3_edges, radius=FILLET3_R)

    # Fillet4
    fillet4_edges = [part.edges().sort_by_distance(p)[0] for p in [
        (0, 4.55, -3.5),
    ]]
    fillet(fillet4_edges, radius=FILLET4_R)


solid = part.part
